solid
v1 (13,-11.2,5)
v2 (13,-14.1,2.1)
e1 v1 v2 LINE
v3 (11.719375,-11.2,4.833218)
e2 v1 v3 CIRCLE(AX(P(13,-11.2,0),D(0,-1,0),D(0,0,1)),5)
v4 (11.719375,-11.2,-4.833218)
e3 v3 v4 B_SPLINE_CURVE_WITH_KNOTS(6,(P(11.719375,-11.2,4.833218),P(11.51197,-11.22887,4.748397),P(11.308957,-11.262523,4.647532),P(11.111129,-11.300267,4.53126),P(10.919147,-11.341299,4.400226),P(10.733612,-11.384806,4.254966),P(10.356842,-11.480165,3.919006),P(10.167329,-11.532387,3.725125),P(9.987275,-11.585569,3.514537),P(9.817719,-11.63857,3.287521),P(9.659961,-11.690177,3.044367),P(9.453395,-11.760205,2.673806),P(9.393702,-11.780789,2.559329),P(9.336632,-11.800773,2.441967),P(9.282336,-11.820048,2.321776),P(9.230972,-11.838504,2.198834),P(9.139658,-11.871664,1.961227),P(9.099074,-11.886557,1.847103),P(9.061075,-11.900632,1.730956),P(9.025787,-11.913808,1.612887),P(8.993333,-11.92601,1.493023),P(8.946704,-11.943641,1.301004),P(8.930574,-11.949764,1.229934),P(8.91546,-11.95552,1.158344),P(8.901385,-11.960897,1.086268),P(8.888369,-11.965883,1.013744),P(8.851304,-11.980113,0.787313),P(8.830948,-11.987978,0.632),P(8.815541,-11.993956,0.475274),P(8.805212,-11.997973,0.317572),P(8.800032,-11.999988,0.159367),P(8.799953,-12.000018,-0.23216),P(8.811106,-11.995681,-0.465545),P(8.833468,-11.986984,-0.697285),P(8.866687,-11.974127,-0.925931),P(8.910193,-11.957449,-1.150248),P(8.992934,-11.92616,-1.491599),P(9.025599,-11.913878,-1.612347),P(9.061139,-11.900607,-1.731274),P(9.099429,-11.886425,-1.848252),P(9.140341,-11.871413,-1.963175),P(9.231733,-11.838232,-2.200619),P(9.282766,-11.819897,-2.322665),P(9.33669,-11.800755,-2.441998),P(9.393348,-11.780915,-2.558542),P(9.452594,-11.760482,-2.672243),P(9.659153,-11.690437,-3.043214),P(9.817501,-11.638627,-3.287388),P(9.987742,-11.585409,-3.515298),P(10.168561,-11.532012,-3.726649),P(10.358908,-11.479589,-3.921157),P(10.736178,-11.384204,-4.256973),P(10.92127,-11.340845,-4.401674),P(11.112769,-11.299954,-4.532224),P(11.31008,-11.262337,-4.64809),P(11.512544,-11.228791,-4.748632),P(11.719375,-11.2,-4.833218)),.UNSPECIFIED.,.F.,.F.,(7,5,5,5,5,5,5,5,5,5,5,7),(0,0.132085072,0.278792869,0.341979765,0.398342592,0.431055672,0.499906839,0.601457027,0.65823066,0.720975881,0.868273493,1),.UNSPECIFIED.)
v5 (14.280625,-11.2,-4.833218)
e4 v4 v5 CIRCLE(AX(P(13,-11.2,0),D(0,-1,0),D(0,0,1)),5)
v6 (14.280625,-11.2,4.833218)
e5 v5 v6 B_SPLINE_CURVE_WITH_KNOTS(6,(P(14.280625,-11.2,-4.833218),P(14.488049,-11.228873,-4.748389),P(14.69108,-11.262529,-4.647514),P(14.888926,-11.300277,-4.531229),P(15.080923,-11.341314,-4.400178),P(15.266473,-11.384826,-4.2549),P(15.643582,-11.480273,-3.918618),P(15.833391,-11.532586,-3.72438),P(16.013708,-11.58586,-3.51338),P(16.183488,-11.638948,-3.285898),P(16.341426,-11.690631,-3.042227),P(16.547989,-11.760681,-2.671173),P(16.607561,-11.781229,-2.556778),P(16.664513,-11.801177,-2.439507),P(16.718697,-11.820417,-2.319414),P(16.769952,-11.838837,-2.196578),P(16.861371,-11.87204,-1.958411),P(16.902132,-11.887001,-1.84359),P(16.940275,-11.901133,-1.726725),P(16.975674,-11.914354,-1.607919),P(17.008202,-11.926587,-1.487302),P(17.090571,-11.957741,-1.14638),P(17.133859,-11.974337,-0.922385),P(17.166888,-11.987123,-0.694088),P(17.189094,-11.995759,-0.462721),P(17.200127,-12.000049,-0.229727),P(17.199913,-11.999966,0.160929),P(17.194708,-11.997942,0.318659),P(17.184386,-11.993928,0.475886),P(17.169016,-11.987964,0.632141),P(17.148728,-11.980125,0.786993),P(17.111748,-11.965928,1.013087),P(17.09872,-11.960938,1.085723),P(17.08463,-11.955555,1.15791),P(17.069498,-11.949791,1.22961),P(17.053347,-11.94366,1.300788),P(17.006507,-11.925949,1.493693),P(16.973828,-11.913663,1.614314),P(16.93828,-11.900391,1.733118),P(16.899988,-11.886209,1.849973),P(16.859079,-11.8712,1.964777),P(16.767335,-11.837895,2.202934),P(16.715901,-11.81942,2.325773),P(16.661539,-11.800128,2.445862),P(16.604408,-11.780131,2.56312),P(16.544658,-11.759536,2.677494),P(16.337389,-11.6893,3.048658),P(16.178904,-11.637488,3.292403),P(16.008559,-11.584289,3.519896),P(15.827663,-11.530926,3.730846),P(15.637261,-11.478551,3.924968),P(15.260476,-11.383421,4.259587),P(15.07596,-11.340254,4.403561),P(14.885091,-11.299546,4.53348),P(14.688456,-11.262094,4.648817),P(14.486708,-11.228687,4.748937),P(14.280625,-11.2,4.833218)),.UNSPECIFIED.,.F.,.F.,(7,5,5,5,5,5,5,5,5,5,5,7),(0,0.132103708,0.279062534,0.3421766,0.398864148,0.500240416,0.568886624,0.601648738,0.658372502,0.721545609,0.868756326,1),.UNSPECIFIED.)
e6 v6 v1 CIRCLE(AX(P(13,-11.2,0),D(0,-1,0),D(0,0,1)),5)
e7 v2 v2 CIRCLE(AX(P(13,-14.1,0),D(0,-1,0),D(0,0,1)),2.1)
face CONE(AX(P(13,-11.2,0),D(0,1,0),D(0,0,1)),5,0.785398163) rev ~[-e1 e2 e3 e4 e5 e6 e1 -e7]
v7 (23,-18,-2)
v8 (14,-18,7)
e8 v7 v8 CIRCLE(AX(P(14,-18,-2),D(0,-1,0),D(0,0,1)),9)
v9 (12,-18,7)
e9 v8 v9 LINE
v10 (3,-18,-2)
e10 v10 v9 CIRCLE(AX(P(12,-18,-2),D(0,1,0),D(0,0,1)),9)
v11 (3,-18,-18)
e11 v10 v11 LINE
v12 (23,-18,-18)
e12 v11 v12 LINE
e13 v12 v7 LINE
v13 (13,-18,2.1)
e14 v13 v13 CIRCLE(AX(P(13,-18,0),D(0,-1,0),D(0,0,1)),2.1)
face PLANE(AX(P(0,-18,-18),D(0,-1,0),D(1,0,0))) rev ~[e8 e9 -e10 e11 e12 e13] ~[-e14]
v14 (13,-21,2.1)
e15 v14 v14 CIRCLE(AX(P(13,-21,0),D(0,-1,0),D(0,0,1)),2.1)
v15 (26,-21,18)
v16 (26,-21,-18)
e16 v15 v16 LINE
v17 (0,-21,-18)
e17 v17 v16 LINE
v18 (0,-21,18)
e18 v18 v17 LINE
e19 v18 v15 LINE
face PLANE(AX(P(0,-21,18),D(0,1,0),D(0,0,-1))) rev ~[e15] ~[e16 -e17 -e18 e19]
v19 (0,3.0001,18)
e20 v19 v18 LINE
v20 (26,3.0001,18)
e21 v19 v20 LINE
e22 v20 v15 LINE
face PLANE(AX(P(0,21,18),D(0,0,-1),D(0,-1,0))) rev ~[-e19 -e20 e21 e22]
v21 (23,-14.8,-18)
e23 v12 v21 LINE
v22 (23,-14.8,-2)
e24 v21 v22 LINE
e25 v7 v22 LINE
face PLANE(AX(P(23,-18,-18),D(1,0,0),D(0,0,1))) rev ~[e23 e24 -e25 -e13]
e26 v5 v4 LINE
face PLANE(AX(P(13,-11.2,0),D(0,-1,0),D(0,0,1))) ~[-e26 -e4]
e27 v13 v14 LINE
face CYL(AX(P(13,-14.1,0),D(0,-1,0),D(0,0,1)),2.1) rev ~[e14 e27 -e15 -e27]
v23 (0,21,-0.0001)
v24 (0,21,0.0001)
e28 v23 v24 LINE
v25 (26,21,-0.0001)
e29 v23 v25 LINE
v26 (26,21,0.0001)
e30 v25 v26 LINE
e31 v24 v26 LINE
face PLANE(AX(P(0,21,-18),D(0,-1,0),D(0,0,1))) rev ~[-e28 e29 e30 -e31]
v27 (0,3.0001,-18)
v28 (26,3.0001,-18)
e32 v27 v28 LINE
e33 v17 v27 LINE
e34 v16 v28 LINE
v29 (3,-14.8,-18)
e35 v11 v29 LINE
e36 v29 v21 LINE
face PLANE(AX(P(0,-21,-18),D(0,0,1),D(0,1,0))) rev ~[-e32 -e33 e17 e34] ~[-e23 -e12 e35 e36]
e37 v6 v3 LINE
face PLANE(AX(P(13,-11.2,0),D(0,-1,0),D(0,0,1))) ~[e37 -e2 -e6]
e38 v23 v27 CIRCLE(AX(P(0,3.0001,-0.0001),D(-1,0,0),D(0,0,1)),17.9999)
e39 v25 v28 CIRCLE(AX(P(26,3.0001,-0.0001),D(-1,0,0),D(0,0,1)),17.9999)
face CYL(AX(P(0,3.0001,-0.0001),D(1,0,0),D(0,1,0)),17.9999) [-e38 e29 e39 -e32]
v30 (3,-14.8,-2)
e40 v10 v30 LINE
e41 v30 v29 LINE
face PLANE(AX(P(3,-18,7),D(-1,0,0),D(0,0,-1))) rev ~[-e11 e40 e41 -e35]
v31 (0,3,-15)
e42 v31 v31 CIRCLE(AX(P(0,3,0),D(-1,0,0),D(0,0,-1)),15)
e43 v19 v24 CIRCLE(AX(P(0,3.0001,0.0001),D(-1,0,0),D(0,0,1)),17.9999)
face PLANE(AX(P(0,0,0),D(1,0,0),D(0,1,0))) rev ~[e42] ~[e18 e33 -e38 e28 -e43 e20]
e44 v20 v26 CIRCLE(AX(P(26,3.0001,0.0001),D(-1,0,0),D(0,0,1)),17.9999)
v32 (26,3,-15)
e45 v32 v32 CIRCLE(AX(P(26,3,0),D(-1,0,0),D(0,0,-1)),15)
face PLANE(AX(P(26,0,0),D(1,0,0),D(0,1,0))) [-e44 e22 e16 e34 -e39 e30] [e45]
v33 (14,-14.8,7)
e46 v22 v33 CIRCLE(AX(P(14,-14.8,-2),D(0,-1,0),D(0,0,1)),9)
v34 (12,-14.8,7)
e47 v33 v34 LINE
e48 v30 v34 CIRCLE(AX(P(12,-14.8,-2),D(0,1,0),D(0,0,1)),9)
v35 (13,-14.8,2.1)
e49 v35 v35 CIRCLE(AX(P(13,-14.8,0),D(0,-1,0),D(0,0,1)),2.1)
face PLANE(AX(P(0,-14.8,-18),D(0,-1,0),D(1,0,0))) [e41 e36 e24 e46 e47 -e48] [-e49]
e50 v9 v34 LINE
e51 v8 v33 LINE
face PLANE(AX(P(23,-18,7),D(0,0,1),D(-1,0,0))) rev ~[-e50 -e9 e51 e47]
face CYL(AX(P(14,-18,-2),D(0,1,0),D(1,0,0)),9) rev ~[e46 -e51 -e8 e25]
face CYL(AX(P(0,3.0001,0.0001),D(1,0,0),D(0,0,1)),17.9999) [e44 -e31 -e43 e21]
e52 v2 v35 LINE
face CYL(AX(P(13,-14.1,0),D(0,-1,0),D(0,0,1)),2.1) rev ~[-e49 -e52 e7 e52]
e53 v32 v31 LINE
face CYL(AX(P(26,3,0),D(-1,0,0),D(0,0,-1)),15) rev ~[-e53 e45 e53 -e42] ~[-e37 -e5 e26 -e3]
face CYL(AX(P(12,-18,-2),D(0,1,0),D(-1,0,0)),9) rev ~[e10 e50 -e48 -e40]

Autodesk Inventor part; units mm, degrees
ref_plane "YZ Plane" through (0, 0, 0) normal (1, 0, 0) x (0, 1, 0)
ref_plane "XZ Plane" through (0, 0, 0) normal (0, 1, 0) x (-1, 0, 0)
ref_plane "XY Plane" through (0, 0, 0) normal (0, 0, 1) x (1, 0, 0)
sketch "Skizze1" plane through (0, 0, 0) normal (1, 0, 0) x (0, 1, 0)
  line L0 (-21, -18) -> (21, -18)
  line L1 (21, -18) -> (21, 18)
  line L2 (21, 18) -> (-21, 18)
  line L3 (-21, 18) -> (-21, -18)
  line L4 (-21, -18) -> (21, 18) construction
  line L5 (21, -18) -> (-21, 18) construction
  point P0 (0, 0)
  dimension "d0" = 42
  dimension "d1" = 36
extrude "Extrusion1" add sketch "Skizze1" along normal blind 26
fillet "Rundung1" radius 18 2 edges at (13, 21, 18) (13, 21, -18)
sketch "Skizze2" plane through (26, 0, 0) normal (1, 0, 0) x (0, 0, -1)
  arc A0 (18, 3) -> (-18, 3) centre (0, 3) ccw projected
  circle A1 centre (0, 3) radius 15
  point P0 (0, 0)
  dimension "d5" = 30
hole "Bohrung1" at (26, 3, 0) direction (-1, 0, 0) diameter 30 end through all
ref_plane "Arbeitsebene2" through (0, -18, -18) normal (0, -1, 0) x (1, 0, 0)
ref_plane "Arbeitsebene3" through (0, -14.8, -18) normal (0, -1, 0) x (1, 0, 0)
sketch "Skizze3" plane through (0, -21, -18) normal (0, -1, 0) x (1, 0, 0)
  line L0 (0, 0) -> (26, 0) projected
  line L1 (3, 0) -> (23, 0)
  line L2 (23, 0) -> (23, 25)
  line L3 (23, 25) -> (3, 25)
  line L4 (3, 25) -> (3, 0)
  point P0 (0, 18)
  point P1 (13, 0)
  dimension "d15" = 20
  dimension "d16" = 25
extrude "Extrusion2" cut sketch "Skizze3" against normal up to surface (3.2 mm away) from surface at -3
fillet "Rundung2" radius 9 2 edges at (23, -16.4, 7) (3, -16.4, 7)
ref_plane "Arbeitsebene7" through (-35.1228, -11.2, 0) normal (0, -1, 0) x (1, 0, 0)
ref_plane "Arbeitsebene6" through (-35.1228, -12, 0) normal (0, -1, 0) x (1, 0, 0)
sketch "Skizze9" plane through (-35.1228, -11.2, 0) normal (0, -1, 0) x (1, 0, 0)
  line L0 (61.1228, 15) -> (61.1228, -15) projected
  line L1 (61.1228, -18) -> (35.1228, -18) projected
  point P0 (35.1228, 0)
  point P1 (48.1228, 0)
  dimension "d49" = 13
  dimension "d50" = 18
hole "Bohrung5" at (13, -11.2, 0) direction (0, -1, 0) diameter 4.2 depth 15 countersink diameter 10 countersink angle 90
